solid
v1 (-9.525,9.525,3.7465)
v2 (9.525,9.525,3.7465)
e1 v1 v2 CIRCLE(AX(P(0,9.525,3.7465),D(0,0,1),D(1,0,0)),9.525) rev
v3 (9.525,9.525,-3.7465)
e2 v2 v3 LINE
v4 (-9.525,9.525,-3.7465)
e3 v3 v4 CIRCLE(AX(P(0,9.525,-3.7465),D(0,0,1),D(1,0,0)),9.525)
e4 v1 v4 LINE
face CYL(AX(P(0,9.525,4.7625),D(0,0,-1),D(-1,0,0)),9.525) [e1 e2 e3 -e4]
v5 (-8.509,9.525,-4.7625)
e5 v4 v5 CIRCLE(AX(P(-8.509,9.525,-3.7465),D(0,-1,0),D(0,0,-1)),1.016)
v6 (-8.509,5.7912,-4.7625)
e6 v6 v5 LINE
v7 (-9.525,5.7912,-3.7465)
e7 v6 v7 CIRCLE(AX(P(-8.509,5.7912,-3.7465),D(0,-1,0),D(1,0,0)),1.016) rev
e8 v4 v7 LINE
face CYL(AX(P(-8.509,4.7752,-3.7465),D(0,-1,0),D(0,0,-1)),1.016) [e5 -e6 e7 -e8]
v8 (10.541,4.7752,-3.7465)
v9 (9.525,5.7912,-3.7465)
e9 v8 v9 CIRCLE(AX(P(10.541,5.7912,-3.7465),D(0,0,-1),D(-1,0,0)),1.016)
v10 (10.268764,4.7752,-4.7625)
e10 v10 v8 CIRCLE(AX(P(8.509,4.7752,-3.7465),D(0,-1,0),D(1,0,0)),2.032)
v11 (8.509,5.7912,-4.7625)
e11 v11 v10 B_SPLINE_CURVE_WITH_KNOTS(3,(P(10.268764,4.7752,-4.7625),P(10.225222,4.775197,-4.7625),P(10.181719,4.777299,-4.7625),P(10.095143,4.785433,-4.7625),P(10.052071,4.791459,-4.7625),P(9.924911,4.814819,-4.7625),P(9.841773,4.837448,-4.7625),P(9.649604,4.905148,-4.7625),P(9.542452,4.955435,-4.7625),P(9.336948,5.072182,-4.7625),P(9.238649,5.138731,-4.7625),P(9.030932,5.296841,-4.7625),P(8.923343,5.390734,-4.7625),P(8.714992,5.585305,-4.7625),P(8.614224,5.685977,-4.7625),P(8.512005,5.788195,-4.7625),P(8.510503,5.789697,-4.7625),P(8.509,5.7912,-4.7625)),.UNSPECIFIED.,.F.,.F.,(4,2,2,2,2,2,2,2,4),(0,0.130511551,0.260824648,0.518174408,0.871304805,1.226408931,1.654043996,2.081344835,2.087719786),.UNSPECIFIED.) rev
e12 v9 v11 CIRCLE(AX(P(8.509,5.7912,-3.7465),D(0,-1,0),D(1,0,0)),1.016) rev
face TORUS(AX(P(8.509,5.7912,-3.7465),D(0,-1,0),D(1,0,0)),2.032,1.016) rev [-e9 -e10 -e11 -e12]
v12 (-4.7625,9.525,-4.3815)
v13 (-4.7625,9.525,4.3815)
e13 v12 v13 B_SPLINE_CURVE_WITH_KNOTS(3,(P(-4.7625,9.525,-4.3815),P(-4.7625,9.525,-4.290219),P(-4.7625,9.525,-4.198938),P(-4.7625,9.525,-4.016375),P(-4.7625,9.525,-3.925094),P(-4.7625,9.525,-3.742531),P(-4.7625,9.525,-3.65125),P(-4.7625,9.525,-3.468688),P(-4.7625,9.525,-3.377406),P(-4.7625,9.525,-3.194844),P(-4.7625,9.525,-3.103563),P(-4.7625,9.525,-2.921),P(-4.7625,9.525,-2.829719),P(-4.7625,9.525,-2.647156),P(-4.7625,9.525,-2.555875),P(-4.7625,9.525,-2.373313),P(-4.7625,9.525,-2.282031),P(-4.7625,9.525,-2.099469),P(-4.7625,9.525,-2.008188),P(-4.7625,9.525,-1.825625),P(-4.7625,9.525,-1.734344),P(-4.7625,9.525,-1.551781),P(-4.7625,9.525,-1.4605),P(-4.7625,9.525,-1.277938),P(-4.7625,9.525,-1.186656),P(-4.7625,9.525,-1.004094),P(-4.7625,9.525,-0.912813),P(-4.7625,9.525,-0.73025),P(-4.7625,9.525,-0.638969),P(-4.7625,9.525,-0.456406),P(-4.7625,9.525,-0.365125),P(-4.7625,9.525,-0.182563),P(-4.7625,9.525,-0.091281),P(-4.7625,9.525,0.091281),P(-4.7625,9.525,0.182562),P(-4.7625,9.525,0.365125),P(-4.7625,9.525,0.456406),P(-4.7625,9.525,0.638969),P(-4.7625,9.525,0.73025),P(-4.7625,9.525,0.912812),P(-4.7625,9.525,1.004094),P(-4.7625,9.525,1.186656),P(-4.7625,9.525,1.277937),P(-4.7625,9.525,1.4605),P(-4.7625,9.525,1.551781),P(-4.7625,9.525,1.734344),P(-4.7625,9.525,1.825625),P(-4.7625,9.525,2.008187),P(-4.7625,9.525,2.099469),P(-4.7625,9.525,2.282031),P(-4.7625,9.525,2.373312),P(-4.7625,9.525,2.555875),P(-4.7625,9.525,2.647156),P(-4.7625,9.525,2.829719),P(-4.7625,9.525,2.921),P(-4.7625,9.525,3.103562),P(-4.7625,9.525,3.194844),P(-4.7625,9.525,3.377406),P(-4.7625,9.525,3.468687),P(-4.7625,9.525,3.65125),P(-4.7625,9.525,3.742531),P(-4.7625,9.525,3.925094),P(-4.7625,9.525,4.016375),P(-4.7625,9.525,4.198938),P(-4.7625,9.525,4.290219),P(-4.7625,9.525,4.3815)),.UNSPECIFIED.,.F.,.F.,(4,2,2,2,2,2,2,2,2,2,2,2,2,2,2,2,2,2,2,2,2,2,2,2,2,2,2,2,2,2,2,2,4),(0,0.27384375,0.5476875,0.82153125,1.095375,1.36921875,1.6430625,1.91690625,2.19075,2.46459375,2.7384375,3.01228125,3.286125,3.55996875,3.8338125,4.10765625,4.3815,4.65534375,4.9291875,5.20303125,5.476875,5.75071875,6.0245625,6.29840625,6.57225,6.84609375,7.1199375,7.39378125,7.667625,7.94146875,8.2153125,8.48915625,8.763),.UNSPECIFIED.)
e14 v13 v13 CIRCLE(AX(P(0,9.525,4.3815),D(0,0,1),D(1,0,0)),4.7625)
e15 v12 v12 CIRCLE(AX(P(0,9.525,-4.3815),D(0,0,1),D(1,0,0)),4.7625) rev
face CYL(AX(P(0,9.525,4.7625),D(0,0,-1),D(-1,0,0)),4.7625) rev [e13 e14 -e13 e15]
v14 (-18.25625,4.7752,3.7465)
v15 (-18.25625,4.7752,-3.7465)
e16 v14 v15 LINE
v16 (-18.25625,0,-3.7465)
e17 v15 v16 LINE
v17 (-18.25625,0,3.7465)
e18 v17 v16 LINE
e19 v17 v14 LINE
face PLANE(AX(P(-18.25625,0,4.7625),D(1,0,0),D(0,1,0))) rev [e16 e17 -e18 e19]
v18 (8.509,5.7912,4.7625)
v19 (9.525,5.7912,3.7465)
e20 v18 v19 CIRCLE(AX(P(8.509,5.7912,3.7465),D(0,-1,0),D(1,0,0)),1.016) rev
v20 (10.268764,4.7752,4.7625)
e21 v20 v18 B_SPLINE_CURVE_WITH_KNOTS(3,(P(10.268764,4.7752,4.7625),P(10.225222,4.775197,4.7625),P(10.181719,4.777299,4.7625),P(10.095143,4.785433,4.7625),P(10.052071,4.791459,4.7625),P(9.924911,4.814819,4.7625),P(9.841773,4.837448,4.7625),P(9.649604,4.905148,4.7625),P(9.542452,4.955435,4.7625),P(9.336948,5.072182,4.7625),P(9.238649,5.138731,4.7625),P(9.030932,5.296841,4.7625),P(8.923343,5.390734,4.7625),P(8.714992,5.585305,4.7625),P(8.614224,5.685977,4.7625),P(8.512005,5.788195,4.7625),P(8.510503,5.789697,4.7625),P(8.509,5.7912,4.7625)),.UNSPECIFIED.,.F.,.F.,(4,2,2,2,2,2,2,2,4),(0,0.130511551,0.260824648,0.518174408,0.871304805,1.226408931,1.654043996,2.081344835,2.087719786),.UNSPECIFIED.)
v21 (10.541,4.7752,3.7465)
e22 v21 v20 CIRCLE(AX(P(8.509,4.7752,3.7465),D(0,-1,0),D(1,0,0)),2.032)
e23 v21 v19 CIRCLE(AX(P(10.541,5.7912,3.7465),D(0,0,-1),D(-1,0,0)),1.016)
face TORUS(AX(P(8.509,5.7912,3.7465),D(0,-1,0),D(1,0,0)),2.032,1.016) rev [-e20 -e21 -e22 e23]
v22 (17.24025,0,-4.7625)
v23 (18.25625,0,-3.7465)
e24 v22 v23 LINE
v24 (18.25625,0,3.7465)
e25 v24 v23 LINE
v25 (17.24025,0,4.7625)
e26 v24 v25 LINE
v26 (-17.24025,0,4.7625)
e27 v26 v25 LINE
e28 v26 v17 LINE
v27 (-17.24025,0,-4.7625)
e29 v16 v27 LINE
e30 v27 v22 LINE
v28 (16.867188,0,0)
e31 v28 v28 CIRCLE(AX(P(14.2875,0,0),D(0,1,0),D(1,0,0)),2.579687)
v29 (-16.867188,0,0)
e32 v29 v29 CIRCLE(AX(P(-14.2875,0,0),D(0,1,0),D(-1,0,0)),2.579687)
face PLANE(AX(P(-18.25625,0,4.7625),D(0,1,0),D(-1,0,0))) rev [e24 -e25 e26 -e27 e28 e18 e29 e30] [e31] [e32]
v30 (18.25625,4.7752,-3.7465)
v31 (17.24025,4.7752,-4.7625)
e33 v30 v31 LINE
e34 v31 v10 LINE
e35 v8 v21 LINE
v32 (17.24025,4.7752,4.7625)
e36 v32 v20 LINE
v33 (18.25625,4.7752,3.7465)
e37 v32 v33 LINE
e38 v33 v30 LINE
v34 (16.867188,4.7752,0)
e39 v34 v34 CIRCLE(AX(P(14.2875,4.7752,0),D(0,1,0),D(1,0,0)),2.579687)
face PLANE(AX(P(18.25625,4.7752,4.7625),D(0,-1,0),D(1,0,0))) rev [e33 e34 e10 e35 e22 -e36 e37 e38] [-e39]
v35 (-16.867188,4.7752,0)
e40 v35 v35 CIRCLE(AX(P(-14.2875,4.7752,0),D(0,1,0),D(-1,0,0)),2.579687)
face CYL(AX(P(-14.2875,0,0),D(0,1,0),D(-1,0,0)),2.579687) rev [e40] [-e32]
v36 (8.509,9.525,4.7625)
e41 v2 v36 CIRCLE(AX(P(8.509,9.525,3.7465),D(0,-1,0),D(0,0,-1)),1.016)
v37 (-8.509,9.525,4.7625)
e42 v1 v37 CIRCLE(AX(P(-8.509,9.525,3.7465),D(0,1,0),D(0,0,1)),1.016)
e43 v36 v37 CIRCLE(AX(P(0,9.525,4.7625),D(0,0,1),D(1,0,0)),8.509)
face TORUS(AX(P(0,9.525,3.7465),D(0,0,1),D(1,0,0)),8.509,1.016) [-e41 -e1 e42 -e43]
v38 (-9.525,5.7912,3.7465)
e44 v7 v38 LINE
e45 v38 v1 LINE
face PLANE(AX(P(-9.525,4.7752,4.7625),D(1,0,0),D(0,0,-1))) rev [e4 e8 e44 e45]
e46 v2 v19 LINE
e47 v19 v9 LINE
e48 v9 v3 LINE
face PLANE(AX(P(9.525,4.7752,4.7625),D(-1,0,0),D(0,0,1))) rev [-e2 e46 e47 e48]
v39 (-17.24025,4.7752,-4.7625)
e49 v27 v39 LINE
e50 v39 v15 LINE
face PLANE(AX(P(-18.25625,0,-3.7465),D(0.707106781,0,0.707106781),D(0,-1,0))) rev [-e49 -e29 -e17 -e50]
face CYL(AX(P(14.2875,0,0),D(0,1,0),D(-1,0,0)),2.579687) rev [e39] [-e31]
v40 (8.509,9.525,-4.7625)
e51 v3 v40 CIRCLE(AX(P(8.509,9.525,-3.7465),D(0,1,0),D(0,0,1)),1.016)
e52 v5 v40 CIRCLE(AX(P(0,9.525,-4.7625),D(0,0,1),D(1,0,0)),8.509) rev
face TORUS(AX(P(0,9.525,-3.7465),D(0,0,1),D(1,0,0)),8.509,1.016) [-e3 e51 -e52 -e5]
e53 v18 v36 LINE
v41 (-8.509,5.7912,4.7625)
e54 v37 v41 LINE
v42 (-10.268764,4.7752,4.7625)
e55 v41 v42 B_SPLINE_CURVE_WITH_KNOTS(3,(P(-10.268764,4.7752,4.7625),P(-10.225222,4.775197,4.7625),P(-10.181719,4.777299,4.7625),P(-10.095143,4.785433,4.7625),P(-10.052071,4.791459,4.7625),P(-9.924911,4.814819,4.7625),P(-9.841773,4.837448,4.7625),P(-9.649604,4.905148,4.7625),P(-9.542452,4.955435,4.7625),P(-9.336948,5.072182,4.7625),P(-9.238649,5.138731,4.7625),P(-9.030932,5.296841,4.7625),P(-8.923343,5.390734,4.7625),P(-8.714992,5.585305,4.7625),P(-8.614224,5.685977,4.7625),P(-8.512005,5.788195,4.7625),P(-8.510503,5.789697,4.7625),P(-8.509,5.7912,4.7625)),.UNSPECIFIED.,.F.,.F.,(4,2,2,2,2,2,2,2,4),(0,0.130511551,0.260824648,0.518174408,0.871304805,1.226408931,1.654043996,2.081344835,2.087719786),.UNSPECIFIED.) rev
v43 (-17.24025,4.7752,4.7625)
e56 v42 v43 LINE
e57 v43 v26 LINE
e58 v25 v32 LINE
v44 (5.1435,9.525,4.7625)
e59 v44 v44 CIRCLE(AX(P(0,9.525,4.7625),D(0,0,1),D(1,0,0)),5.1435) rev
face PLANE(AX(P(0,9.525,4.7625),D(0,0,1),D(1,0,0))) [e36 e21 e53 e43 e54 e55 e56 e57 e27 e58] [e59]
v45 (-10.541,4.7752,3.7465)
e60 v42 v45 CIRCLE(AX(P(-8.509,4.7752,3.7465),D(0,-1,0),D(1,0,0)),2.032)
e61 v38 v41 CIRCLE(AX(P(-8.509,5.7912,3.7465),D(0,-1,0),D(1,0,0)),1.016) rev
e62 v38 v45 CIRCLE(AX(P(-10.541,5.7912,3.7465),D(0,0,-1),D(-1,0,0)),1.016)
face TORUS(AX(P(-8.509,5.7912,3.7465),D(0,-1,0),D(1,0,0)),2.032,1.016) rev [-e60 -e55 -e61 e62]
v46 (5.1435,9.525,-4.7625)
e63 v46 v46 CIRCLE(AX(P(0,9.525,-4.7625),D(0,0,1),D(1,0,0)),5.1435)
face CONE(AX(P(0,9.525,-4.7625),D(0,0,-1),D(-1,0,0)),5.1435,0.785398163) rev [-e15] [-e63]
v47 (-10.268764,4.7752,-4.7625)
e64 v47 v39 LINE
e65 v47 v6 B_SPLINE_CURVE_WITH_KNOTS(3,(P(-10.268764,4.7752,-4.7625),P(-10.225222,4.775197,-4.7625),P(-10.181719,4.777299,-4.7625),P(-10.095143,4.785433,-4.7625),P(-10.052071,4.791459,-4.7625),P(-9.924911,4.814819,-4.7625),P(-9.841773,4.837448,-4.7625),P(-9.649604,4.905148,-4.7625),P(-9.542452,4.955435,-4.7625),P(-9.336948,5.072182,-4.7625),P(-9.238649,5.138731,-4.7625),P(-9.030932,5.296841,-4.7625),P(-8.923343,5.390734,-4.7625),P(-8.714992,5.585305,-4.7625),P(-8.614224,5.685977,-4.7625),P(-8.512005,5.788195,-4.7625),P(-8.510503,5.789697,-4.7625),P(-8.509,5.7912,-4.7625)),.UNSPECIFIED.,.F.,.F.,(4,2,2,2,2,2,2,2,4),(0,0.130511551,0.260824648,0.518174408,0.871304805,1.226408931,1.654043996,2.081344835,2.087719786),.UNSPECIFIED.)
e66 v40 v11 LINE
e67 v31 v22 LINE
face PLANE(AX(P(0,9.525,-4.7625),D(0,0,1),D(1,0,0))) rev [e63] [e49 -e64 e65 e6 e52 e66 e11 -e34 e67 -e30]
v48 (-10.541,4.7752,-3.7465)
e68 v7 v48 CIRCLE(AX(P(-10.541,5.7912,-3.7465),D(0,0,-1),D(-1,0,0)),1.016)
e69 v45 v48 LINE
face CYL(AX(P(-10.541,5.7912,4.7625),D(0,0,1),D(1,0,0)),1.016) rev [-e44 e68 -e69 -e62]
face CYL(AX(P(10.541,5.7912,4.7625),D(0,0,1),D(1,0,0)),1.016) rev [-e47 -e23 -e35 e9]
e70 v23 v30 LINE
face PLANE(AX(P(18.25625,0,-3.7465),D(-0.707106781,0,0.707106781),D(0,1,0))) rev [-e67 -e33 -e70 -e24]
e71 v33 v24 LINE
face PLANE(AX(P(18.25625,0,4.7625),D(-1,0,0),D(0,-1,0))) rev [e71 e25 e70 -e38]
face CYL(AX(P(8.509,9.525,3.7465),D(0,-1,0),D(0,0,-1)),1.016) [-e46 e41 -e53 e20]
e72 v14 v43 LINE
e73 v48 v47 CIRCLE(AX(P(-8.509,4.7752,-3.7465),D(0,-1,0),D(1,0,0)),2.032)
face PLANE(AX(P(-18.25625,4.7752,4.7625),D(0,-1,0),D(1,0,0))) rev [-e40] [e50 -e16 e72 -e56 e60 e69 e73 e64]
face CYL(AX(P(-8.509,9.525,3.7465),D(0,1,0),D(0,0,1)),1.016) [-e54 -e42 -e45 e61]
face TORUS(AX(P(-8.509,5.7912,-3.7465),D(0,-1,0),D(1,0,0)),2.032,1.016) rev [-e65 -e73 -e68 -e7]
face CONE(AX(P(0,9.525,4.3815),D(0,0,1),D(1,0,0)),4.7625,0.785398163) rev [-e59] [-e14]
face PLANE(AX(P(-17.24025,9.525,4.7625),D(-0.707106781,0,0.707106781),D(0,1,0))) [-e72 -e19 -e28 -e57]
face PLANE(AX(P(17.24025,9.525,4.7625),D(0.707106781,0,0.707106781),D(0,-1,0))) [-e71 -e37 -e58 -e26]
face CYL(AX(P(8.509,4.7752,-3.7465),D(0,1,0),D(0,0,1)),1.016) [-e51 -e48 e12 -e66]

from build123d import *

# Parameters (mm, degrees)
SKETCH2_R          = 4.7625
BODY_EXTRUDE_DEPTH = 4.7625
BODY_FILLET_A_R    = 1.016
BODY_FILLET_B_R    = 1.016
CHAMFER2_SIZE      = 1.016
ID_CHAMFER_SIZE    = 0.381
SKETCH3_R          = 2.5796875
HOLE_CUT_DEPTH     = 24.65886697


with BuildPart() as part:
    # Sketch2 → Body Extrude (new, symmetric)
    with BuildSketch(Plane.XY):
        with BuildLine():
            Line((-18.25625, 0), (-18.25625, 4.7752))
            Line((-18.25625, 4.7752), (-9.525, 4.7752))
            Line((-9.525, 4.7752), (-9.525, 9.525))
            ThreePointArc((-9.525, 9.525), (0, 19.05), (9.525, 9.525))
            Line((9.525, 9.525), (9.525, 4.7752))
            Line((9.525, 4.7752), (18.25625, 4.7752))
            Line((18.25625, 4.7752), (18.25625, 0))
            Line((18.25625, 0), (-18.25625, 0))
        make_face()
        with Locations(Location((0, 9.525, 0), (0, 0, 180))):
            Circle(SKETCH2_R, mode=Mode.SUBTRACT)
    extrude(amount=BODY_EXTRUDE_DEPTH, both=True)

    # Body Fillet A
    body_fillet_a_edges = [part.edges().sort_by_distance(p)[0] for p in [
        (9.525, 7.1501, 4.7625),
        (0, 19.05, 4.7625),
        (-9.525, 7.1501, 4.7625),
        (-9.525, 7.1501, -4.7625),
        (0, 19.05, -4.7625),
        (9.525, 7.1501, -4.7625),
    ]]
    fillet(body_fillet_a_edges, radius=BODY_FILLET_A_R)

    # Body Fillet B
    # the kernel refuses this fillet: 1.016 mm, written as the material it adds along each edge
    with BuildSketch(Plane(origin=(-9.525, 4.7752, 3.7465), x_dir=(0, 1, 0), z_dir=(0, 0, -1))) as body_fillet_b_piece_1:
        with BuildLine():
            CenterArc((BODY_FILLET_B_R, -BODY_FILLET_B_R), BODY_FILLET_B_R, 90, 90)
            Line((0, -BODY_FILLET_B_R), (0, 0))
            Line((0, 0), (BODY_FILLET_B_R, 0))
        make_face()
    extrude(amount=7.493)
    with BuildSketch(Plane(origin=(9.525, 4.7752, 3.7465), x_dir=(0, 1, 0), z_dir=(0, 0, -1))) as body_fillet_b_piece_2:
        with BuildLine():
            CenterArc((BODY_FILLET_B_R, BODY_FILLET_B_R), BODY_FILLET_B_R, 180, 90)
            Line((0, BODY_FILLET_B_R), (0, 0))
            Line((0, 0), (BODY_FILLET_B_R, 0))
        make_face()
    extrude(amount=7.493)
    with BuildSketch(Plane(origin=(-8.509, 4.7752, -3.7465), x_dir=(-1, 0, 0), z_dir=(0, 0, 1))) as body_fillet_b_piece_3_section:
        with BuildLine():
            CenterArc((1.016 + BODY_FILLET_B_R, -BODY_FILLET_B_R), BODY_FILLET_B_R, 90, 90)
            Line((1.016 + BODY_FILLET_B_R, 0), (1.016, 0))
            Line((1.016, 0), (1.016, -BODY_FILLET_B_R))
        make_face()
    body_fillet_b_piece_3 = revolve(axis=Axis((-8.509, 4.7752, -3.7465), (0, -1, 0)), revolution_arc=233.296989237, mode=Mode.PRIVATE)
    body_fillet_b_piece_3 = split(body_fillet_b_piece_3, bisect_by=Plane(origin=(-9.270938019, 5.091814151, -4.7625), z_dir=(0, 0, 1)), keep=Keep.TOP, mode=Mode.PRIVATE)
    add(body_fillet_b_piece_3)
    with BuildSketch(Plane(origin=(8.509, 4.7752, 3.7465), x_dir=(-0.5976672776328273, 0, -0.8017442392976483), z_dir=(0.8017442392976483, 0, -0.5976672776328273))) as body_fillet_b_piece_4_section:
        with BuildLine():
            CenterArc((1.016 + BODY_FILLET_B_R, BODY_FILLET_B_R), BODY_FILLET_B_R, 180, 90)
            Line((1.016, BODY_FILLET_B_R), (1.016, 0))
            Line((1.016, 0), (1.016 + BODY_FILLET_B_R, 0))
        make_face()
    body_fillet_b_piece_4 = revolve(axis=Axis((8.509, 4.7752, 3.7465), (0, 1, 0)), revolution_arc=233.296989237, mode=Mode.PRIVATE)
    body_fillet_b_piece_4 = split(body_fillet_b_piece_4, bisect_by=Plane(origin=(9.270937806, 5.091814769, 4.7625), z_dir=(0, 0, -1)), keep=Keep.TOP, mode=Mode.PRIVATE)
    add(body_fillet_b_piece_4)
    with BuildSketch(Plane(origin=(8.509, 4.7752, -3.7465), x_dir=(1, 0, 0), z_dir=(0, 0, 1))) as body_fillet_b_piece_5_section:
        with BuildLine():
            CenterArc((1.016 + BODY_FILLET_B_R, BODY_FILLET_B_R), BODY_FILLET_B_R, 180, 90)
            Line((1.016 + BODY_FILLET_B_R, 0), (1.016, 0))
            Line((1.016, 0), (1.016, BODY_FILLET_B_R))
        make_face()
    body_fillet_b_piece_5 = revolve(axis=Axis((8.509, 4.7752, -3.7465), (0, 1, 0)), revolution_arc=233.296989237, mode=Mode.PRIVATE)
    body_fillet_b_piece_5 = split(body_fillet_b_piece_5, bisect_by=Plane(origin=(9.270937903, 5.091814444, -4.7625), z_dir=(0, 0, 1)), keep=Keep.TOP, mode=Mode.PRIVATE)
    add(body_fillet_b_piece_5)
    with BuildSketch(Plane(origin=(-8.509, 4.7752, 3.7465), x_dir=(0.5976672776328271, 0, -0.8017442392976484), z_dir=(-0.8017442392976484, 0, -0.5976672776328271))) as body_fillet_b_piece_6_section:
        with BuildLine():
            CenterArc((1.016 + BODY_FILLET_B_R, -BODY_FILLET_B_R), BODY_FILLET_B_R, 90, 90)
            Line((1.016 + BODY_FILLET_B_R, 0), (1.016, 0))
            Line((1.016, 0), (1.016, -BODY_FILLET_B_R))
        make_face()
    body_fillet_b_piece_6 = revolve(axis=Axis((-8.509, 4.7752, 3.7465), (0, -1, 0)), revolution_arc=233.296989237, mode=Mode.PRIVATE)
    body_fillet_b_piece_6 = split(body_fillet_b_piece_6, bisect_by=Plane(origin=(-9.270937967, 5.09181436, 4.7625), z_dir=(0, 0, -1)), keep=Keep.TOP, mode=Mode.PRIVATE)
    add(body_fillet_b_piece_6)

    # Chamfer2
    chamfer2_edges = [part.edges().sort_by_distance(p)[0] for p in [
        (18.25625, 2.3876, -4.7625),
        (-18.25625, 2.3876, 4.7625),
        (18.25625, 2.3876, 4.7625),
        (-18.25625, 2.3876, -4.7625),
    ]]
    chamfer(chamfer2_edges, length=CHAMFER2_SIZE)

    # ID Chamfer
    id_chamfer_edges = [part.edges().sort_by_distance(p)[0] for p in [
        (4.7625, 9.525, -4.7625),
        (4.7625, 9.525, 4.7625),
    ]]
    chamfer(id_chamfer_edges, length=ID_CHAMFER_SIZE)

    # Sketch3 → Hole Cut (cut, through all)
    with BuildSketch(Plane(origin=(0, 4.7752, 0), x_dir=(1, 0, 0), z_dir=(0, 1, 0))):
        with Locations(Location((-14.2875, 0, 0), (0, 0, 180))):
            Circle(SKETCH3_R)
        with Locations((14.2875, 0)):
            Circle(SKETCH3_R)
    extrude(amount=-HOLE_CUT_DEPTH, mode=Mode.SUBTRACT)


solid = part.part
